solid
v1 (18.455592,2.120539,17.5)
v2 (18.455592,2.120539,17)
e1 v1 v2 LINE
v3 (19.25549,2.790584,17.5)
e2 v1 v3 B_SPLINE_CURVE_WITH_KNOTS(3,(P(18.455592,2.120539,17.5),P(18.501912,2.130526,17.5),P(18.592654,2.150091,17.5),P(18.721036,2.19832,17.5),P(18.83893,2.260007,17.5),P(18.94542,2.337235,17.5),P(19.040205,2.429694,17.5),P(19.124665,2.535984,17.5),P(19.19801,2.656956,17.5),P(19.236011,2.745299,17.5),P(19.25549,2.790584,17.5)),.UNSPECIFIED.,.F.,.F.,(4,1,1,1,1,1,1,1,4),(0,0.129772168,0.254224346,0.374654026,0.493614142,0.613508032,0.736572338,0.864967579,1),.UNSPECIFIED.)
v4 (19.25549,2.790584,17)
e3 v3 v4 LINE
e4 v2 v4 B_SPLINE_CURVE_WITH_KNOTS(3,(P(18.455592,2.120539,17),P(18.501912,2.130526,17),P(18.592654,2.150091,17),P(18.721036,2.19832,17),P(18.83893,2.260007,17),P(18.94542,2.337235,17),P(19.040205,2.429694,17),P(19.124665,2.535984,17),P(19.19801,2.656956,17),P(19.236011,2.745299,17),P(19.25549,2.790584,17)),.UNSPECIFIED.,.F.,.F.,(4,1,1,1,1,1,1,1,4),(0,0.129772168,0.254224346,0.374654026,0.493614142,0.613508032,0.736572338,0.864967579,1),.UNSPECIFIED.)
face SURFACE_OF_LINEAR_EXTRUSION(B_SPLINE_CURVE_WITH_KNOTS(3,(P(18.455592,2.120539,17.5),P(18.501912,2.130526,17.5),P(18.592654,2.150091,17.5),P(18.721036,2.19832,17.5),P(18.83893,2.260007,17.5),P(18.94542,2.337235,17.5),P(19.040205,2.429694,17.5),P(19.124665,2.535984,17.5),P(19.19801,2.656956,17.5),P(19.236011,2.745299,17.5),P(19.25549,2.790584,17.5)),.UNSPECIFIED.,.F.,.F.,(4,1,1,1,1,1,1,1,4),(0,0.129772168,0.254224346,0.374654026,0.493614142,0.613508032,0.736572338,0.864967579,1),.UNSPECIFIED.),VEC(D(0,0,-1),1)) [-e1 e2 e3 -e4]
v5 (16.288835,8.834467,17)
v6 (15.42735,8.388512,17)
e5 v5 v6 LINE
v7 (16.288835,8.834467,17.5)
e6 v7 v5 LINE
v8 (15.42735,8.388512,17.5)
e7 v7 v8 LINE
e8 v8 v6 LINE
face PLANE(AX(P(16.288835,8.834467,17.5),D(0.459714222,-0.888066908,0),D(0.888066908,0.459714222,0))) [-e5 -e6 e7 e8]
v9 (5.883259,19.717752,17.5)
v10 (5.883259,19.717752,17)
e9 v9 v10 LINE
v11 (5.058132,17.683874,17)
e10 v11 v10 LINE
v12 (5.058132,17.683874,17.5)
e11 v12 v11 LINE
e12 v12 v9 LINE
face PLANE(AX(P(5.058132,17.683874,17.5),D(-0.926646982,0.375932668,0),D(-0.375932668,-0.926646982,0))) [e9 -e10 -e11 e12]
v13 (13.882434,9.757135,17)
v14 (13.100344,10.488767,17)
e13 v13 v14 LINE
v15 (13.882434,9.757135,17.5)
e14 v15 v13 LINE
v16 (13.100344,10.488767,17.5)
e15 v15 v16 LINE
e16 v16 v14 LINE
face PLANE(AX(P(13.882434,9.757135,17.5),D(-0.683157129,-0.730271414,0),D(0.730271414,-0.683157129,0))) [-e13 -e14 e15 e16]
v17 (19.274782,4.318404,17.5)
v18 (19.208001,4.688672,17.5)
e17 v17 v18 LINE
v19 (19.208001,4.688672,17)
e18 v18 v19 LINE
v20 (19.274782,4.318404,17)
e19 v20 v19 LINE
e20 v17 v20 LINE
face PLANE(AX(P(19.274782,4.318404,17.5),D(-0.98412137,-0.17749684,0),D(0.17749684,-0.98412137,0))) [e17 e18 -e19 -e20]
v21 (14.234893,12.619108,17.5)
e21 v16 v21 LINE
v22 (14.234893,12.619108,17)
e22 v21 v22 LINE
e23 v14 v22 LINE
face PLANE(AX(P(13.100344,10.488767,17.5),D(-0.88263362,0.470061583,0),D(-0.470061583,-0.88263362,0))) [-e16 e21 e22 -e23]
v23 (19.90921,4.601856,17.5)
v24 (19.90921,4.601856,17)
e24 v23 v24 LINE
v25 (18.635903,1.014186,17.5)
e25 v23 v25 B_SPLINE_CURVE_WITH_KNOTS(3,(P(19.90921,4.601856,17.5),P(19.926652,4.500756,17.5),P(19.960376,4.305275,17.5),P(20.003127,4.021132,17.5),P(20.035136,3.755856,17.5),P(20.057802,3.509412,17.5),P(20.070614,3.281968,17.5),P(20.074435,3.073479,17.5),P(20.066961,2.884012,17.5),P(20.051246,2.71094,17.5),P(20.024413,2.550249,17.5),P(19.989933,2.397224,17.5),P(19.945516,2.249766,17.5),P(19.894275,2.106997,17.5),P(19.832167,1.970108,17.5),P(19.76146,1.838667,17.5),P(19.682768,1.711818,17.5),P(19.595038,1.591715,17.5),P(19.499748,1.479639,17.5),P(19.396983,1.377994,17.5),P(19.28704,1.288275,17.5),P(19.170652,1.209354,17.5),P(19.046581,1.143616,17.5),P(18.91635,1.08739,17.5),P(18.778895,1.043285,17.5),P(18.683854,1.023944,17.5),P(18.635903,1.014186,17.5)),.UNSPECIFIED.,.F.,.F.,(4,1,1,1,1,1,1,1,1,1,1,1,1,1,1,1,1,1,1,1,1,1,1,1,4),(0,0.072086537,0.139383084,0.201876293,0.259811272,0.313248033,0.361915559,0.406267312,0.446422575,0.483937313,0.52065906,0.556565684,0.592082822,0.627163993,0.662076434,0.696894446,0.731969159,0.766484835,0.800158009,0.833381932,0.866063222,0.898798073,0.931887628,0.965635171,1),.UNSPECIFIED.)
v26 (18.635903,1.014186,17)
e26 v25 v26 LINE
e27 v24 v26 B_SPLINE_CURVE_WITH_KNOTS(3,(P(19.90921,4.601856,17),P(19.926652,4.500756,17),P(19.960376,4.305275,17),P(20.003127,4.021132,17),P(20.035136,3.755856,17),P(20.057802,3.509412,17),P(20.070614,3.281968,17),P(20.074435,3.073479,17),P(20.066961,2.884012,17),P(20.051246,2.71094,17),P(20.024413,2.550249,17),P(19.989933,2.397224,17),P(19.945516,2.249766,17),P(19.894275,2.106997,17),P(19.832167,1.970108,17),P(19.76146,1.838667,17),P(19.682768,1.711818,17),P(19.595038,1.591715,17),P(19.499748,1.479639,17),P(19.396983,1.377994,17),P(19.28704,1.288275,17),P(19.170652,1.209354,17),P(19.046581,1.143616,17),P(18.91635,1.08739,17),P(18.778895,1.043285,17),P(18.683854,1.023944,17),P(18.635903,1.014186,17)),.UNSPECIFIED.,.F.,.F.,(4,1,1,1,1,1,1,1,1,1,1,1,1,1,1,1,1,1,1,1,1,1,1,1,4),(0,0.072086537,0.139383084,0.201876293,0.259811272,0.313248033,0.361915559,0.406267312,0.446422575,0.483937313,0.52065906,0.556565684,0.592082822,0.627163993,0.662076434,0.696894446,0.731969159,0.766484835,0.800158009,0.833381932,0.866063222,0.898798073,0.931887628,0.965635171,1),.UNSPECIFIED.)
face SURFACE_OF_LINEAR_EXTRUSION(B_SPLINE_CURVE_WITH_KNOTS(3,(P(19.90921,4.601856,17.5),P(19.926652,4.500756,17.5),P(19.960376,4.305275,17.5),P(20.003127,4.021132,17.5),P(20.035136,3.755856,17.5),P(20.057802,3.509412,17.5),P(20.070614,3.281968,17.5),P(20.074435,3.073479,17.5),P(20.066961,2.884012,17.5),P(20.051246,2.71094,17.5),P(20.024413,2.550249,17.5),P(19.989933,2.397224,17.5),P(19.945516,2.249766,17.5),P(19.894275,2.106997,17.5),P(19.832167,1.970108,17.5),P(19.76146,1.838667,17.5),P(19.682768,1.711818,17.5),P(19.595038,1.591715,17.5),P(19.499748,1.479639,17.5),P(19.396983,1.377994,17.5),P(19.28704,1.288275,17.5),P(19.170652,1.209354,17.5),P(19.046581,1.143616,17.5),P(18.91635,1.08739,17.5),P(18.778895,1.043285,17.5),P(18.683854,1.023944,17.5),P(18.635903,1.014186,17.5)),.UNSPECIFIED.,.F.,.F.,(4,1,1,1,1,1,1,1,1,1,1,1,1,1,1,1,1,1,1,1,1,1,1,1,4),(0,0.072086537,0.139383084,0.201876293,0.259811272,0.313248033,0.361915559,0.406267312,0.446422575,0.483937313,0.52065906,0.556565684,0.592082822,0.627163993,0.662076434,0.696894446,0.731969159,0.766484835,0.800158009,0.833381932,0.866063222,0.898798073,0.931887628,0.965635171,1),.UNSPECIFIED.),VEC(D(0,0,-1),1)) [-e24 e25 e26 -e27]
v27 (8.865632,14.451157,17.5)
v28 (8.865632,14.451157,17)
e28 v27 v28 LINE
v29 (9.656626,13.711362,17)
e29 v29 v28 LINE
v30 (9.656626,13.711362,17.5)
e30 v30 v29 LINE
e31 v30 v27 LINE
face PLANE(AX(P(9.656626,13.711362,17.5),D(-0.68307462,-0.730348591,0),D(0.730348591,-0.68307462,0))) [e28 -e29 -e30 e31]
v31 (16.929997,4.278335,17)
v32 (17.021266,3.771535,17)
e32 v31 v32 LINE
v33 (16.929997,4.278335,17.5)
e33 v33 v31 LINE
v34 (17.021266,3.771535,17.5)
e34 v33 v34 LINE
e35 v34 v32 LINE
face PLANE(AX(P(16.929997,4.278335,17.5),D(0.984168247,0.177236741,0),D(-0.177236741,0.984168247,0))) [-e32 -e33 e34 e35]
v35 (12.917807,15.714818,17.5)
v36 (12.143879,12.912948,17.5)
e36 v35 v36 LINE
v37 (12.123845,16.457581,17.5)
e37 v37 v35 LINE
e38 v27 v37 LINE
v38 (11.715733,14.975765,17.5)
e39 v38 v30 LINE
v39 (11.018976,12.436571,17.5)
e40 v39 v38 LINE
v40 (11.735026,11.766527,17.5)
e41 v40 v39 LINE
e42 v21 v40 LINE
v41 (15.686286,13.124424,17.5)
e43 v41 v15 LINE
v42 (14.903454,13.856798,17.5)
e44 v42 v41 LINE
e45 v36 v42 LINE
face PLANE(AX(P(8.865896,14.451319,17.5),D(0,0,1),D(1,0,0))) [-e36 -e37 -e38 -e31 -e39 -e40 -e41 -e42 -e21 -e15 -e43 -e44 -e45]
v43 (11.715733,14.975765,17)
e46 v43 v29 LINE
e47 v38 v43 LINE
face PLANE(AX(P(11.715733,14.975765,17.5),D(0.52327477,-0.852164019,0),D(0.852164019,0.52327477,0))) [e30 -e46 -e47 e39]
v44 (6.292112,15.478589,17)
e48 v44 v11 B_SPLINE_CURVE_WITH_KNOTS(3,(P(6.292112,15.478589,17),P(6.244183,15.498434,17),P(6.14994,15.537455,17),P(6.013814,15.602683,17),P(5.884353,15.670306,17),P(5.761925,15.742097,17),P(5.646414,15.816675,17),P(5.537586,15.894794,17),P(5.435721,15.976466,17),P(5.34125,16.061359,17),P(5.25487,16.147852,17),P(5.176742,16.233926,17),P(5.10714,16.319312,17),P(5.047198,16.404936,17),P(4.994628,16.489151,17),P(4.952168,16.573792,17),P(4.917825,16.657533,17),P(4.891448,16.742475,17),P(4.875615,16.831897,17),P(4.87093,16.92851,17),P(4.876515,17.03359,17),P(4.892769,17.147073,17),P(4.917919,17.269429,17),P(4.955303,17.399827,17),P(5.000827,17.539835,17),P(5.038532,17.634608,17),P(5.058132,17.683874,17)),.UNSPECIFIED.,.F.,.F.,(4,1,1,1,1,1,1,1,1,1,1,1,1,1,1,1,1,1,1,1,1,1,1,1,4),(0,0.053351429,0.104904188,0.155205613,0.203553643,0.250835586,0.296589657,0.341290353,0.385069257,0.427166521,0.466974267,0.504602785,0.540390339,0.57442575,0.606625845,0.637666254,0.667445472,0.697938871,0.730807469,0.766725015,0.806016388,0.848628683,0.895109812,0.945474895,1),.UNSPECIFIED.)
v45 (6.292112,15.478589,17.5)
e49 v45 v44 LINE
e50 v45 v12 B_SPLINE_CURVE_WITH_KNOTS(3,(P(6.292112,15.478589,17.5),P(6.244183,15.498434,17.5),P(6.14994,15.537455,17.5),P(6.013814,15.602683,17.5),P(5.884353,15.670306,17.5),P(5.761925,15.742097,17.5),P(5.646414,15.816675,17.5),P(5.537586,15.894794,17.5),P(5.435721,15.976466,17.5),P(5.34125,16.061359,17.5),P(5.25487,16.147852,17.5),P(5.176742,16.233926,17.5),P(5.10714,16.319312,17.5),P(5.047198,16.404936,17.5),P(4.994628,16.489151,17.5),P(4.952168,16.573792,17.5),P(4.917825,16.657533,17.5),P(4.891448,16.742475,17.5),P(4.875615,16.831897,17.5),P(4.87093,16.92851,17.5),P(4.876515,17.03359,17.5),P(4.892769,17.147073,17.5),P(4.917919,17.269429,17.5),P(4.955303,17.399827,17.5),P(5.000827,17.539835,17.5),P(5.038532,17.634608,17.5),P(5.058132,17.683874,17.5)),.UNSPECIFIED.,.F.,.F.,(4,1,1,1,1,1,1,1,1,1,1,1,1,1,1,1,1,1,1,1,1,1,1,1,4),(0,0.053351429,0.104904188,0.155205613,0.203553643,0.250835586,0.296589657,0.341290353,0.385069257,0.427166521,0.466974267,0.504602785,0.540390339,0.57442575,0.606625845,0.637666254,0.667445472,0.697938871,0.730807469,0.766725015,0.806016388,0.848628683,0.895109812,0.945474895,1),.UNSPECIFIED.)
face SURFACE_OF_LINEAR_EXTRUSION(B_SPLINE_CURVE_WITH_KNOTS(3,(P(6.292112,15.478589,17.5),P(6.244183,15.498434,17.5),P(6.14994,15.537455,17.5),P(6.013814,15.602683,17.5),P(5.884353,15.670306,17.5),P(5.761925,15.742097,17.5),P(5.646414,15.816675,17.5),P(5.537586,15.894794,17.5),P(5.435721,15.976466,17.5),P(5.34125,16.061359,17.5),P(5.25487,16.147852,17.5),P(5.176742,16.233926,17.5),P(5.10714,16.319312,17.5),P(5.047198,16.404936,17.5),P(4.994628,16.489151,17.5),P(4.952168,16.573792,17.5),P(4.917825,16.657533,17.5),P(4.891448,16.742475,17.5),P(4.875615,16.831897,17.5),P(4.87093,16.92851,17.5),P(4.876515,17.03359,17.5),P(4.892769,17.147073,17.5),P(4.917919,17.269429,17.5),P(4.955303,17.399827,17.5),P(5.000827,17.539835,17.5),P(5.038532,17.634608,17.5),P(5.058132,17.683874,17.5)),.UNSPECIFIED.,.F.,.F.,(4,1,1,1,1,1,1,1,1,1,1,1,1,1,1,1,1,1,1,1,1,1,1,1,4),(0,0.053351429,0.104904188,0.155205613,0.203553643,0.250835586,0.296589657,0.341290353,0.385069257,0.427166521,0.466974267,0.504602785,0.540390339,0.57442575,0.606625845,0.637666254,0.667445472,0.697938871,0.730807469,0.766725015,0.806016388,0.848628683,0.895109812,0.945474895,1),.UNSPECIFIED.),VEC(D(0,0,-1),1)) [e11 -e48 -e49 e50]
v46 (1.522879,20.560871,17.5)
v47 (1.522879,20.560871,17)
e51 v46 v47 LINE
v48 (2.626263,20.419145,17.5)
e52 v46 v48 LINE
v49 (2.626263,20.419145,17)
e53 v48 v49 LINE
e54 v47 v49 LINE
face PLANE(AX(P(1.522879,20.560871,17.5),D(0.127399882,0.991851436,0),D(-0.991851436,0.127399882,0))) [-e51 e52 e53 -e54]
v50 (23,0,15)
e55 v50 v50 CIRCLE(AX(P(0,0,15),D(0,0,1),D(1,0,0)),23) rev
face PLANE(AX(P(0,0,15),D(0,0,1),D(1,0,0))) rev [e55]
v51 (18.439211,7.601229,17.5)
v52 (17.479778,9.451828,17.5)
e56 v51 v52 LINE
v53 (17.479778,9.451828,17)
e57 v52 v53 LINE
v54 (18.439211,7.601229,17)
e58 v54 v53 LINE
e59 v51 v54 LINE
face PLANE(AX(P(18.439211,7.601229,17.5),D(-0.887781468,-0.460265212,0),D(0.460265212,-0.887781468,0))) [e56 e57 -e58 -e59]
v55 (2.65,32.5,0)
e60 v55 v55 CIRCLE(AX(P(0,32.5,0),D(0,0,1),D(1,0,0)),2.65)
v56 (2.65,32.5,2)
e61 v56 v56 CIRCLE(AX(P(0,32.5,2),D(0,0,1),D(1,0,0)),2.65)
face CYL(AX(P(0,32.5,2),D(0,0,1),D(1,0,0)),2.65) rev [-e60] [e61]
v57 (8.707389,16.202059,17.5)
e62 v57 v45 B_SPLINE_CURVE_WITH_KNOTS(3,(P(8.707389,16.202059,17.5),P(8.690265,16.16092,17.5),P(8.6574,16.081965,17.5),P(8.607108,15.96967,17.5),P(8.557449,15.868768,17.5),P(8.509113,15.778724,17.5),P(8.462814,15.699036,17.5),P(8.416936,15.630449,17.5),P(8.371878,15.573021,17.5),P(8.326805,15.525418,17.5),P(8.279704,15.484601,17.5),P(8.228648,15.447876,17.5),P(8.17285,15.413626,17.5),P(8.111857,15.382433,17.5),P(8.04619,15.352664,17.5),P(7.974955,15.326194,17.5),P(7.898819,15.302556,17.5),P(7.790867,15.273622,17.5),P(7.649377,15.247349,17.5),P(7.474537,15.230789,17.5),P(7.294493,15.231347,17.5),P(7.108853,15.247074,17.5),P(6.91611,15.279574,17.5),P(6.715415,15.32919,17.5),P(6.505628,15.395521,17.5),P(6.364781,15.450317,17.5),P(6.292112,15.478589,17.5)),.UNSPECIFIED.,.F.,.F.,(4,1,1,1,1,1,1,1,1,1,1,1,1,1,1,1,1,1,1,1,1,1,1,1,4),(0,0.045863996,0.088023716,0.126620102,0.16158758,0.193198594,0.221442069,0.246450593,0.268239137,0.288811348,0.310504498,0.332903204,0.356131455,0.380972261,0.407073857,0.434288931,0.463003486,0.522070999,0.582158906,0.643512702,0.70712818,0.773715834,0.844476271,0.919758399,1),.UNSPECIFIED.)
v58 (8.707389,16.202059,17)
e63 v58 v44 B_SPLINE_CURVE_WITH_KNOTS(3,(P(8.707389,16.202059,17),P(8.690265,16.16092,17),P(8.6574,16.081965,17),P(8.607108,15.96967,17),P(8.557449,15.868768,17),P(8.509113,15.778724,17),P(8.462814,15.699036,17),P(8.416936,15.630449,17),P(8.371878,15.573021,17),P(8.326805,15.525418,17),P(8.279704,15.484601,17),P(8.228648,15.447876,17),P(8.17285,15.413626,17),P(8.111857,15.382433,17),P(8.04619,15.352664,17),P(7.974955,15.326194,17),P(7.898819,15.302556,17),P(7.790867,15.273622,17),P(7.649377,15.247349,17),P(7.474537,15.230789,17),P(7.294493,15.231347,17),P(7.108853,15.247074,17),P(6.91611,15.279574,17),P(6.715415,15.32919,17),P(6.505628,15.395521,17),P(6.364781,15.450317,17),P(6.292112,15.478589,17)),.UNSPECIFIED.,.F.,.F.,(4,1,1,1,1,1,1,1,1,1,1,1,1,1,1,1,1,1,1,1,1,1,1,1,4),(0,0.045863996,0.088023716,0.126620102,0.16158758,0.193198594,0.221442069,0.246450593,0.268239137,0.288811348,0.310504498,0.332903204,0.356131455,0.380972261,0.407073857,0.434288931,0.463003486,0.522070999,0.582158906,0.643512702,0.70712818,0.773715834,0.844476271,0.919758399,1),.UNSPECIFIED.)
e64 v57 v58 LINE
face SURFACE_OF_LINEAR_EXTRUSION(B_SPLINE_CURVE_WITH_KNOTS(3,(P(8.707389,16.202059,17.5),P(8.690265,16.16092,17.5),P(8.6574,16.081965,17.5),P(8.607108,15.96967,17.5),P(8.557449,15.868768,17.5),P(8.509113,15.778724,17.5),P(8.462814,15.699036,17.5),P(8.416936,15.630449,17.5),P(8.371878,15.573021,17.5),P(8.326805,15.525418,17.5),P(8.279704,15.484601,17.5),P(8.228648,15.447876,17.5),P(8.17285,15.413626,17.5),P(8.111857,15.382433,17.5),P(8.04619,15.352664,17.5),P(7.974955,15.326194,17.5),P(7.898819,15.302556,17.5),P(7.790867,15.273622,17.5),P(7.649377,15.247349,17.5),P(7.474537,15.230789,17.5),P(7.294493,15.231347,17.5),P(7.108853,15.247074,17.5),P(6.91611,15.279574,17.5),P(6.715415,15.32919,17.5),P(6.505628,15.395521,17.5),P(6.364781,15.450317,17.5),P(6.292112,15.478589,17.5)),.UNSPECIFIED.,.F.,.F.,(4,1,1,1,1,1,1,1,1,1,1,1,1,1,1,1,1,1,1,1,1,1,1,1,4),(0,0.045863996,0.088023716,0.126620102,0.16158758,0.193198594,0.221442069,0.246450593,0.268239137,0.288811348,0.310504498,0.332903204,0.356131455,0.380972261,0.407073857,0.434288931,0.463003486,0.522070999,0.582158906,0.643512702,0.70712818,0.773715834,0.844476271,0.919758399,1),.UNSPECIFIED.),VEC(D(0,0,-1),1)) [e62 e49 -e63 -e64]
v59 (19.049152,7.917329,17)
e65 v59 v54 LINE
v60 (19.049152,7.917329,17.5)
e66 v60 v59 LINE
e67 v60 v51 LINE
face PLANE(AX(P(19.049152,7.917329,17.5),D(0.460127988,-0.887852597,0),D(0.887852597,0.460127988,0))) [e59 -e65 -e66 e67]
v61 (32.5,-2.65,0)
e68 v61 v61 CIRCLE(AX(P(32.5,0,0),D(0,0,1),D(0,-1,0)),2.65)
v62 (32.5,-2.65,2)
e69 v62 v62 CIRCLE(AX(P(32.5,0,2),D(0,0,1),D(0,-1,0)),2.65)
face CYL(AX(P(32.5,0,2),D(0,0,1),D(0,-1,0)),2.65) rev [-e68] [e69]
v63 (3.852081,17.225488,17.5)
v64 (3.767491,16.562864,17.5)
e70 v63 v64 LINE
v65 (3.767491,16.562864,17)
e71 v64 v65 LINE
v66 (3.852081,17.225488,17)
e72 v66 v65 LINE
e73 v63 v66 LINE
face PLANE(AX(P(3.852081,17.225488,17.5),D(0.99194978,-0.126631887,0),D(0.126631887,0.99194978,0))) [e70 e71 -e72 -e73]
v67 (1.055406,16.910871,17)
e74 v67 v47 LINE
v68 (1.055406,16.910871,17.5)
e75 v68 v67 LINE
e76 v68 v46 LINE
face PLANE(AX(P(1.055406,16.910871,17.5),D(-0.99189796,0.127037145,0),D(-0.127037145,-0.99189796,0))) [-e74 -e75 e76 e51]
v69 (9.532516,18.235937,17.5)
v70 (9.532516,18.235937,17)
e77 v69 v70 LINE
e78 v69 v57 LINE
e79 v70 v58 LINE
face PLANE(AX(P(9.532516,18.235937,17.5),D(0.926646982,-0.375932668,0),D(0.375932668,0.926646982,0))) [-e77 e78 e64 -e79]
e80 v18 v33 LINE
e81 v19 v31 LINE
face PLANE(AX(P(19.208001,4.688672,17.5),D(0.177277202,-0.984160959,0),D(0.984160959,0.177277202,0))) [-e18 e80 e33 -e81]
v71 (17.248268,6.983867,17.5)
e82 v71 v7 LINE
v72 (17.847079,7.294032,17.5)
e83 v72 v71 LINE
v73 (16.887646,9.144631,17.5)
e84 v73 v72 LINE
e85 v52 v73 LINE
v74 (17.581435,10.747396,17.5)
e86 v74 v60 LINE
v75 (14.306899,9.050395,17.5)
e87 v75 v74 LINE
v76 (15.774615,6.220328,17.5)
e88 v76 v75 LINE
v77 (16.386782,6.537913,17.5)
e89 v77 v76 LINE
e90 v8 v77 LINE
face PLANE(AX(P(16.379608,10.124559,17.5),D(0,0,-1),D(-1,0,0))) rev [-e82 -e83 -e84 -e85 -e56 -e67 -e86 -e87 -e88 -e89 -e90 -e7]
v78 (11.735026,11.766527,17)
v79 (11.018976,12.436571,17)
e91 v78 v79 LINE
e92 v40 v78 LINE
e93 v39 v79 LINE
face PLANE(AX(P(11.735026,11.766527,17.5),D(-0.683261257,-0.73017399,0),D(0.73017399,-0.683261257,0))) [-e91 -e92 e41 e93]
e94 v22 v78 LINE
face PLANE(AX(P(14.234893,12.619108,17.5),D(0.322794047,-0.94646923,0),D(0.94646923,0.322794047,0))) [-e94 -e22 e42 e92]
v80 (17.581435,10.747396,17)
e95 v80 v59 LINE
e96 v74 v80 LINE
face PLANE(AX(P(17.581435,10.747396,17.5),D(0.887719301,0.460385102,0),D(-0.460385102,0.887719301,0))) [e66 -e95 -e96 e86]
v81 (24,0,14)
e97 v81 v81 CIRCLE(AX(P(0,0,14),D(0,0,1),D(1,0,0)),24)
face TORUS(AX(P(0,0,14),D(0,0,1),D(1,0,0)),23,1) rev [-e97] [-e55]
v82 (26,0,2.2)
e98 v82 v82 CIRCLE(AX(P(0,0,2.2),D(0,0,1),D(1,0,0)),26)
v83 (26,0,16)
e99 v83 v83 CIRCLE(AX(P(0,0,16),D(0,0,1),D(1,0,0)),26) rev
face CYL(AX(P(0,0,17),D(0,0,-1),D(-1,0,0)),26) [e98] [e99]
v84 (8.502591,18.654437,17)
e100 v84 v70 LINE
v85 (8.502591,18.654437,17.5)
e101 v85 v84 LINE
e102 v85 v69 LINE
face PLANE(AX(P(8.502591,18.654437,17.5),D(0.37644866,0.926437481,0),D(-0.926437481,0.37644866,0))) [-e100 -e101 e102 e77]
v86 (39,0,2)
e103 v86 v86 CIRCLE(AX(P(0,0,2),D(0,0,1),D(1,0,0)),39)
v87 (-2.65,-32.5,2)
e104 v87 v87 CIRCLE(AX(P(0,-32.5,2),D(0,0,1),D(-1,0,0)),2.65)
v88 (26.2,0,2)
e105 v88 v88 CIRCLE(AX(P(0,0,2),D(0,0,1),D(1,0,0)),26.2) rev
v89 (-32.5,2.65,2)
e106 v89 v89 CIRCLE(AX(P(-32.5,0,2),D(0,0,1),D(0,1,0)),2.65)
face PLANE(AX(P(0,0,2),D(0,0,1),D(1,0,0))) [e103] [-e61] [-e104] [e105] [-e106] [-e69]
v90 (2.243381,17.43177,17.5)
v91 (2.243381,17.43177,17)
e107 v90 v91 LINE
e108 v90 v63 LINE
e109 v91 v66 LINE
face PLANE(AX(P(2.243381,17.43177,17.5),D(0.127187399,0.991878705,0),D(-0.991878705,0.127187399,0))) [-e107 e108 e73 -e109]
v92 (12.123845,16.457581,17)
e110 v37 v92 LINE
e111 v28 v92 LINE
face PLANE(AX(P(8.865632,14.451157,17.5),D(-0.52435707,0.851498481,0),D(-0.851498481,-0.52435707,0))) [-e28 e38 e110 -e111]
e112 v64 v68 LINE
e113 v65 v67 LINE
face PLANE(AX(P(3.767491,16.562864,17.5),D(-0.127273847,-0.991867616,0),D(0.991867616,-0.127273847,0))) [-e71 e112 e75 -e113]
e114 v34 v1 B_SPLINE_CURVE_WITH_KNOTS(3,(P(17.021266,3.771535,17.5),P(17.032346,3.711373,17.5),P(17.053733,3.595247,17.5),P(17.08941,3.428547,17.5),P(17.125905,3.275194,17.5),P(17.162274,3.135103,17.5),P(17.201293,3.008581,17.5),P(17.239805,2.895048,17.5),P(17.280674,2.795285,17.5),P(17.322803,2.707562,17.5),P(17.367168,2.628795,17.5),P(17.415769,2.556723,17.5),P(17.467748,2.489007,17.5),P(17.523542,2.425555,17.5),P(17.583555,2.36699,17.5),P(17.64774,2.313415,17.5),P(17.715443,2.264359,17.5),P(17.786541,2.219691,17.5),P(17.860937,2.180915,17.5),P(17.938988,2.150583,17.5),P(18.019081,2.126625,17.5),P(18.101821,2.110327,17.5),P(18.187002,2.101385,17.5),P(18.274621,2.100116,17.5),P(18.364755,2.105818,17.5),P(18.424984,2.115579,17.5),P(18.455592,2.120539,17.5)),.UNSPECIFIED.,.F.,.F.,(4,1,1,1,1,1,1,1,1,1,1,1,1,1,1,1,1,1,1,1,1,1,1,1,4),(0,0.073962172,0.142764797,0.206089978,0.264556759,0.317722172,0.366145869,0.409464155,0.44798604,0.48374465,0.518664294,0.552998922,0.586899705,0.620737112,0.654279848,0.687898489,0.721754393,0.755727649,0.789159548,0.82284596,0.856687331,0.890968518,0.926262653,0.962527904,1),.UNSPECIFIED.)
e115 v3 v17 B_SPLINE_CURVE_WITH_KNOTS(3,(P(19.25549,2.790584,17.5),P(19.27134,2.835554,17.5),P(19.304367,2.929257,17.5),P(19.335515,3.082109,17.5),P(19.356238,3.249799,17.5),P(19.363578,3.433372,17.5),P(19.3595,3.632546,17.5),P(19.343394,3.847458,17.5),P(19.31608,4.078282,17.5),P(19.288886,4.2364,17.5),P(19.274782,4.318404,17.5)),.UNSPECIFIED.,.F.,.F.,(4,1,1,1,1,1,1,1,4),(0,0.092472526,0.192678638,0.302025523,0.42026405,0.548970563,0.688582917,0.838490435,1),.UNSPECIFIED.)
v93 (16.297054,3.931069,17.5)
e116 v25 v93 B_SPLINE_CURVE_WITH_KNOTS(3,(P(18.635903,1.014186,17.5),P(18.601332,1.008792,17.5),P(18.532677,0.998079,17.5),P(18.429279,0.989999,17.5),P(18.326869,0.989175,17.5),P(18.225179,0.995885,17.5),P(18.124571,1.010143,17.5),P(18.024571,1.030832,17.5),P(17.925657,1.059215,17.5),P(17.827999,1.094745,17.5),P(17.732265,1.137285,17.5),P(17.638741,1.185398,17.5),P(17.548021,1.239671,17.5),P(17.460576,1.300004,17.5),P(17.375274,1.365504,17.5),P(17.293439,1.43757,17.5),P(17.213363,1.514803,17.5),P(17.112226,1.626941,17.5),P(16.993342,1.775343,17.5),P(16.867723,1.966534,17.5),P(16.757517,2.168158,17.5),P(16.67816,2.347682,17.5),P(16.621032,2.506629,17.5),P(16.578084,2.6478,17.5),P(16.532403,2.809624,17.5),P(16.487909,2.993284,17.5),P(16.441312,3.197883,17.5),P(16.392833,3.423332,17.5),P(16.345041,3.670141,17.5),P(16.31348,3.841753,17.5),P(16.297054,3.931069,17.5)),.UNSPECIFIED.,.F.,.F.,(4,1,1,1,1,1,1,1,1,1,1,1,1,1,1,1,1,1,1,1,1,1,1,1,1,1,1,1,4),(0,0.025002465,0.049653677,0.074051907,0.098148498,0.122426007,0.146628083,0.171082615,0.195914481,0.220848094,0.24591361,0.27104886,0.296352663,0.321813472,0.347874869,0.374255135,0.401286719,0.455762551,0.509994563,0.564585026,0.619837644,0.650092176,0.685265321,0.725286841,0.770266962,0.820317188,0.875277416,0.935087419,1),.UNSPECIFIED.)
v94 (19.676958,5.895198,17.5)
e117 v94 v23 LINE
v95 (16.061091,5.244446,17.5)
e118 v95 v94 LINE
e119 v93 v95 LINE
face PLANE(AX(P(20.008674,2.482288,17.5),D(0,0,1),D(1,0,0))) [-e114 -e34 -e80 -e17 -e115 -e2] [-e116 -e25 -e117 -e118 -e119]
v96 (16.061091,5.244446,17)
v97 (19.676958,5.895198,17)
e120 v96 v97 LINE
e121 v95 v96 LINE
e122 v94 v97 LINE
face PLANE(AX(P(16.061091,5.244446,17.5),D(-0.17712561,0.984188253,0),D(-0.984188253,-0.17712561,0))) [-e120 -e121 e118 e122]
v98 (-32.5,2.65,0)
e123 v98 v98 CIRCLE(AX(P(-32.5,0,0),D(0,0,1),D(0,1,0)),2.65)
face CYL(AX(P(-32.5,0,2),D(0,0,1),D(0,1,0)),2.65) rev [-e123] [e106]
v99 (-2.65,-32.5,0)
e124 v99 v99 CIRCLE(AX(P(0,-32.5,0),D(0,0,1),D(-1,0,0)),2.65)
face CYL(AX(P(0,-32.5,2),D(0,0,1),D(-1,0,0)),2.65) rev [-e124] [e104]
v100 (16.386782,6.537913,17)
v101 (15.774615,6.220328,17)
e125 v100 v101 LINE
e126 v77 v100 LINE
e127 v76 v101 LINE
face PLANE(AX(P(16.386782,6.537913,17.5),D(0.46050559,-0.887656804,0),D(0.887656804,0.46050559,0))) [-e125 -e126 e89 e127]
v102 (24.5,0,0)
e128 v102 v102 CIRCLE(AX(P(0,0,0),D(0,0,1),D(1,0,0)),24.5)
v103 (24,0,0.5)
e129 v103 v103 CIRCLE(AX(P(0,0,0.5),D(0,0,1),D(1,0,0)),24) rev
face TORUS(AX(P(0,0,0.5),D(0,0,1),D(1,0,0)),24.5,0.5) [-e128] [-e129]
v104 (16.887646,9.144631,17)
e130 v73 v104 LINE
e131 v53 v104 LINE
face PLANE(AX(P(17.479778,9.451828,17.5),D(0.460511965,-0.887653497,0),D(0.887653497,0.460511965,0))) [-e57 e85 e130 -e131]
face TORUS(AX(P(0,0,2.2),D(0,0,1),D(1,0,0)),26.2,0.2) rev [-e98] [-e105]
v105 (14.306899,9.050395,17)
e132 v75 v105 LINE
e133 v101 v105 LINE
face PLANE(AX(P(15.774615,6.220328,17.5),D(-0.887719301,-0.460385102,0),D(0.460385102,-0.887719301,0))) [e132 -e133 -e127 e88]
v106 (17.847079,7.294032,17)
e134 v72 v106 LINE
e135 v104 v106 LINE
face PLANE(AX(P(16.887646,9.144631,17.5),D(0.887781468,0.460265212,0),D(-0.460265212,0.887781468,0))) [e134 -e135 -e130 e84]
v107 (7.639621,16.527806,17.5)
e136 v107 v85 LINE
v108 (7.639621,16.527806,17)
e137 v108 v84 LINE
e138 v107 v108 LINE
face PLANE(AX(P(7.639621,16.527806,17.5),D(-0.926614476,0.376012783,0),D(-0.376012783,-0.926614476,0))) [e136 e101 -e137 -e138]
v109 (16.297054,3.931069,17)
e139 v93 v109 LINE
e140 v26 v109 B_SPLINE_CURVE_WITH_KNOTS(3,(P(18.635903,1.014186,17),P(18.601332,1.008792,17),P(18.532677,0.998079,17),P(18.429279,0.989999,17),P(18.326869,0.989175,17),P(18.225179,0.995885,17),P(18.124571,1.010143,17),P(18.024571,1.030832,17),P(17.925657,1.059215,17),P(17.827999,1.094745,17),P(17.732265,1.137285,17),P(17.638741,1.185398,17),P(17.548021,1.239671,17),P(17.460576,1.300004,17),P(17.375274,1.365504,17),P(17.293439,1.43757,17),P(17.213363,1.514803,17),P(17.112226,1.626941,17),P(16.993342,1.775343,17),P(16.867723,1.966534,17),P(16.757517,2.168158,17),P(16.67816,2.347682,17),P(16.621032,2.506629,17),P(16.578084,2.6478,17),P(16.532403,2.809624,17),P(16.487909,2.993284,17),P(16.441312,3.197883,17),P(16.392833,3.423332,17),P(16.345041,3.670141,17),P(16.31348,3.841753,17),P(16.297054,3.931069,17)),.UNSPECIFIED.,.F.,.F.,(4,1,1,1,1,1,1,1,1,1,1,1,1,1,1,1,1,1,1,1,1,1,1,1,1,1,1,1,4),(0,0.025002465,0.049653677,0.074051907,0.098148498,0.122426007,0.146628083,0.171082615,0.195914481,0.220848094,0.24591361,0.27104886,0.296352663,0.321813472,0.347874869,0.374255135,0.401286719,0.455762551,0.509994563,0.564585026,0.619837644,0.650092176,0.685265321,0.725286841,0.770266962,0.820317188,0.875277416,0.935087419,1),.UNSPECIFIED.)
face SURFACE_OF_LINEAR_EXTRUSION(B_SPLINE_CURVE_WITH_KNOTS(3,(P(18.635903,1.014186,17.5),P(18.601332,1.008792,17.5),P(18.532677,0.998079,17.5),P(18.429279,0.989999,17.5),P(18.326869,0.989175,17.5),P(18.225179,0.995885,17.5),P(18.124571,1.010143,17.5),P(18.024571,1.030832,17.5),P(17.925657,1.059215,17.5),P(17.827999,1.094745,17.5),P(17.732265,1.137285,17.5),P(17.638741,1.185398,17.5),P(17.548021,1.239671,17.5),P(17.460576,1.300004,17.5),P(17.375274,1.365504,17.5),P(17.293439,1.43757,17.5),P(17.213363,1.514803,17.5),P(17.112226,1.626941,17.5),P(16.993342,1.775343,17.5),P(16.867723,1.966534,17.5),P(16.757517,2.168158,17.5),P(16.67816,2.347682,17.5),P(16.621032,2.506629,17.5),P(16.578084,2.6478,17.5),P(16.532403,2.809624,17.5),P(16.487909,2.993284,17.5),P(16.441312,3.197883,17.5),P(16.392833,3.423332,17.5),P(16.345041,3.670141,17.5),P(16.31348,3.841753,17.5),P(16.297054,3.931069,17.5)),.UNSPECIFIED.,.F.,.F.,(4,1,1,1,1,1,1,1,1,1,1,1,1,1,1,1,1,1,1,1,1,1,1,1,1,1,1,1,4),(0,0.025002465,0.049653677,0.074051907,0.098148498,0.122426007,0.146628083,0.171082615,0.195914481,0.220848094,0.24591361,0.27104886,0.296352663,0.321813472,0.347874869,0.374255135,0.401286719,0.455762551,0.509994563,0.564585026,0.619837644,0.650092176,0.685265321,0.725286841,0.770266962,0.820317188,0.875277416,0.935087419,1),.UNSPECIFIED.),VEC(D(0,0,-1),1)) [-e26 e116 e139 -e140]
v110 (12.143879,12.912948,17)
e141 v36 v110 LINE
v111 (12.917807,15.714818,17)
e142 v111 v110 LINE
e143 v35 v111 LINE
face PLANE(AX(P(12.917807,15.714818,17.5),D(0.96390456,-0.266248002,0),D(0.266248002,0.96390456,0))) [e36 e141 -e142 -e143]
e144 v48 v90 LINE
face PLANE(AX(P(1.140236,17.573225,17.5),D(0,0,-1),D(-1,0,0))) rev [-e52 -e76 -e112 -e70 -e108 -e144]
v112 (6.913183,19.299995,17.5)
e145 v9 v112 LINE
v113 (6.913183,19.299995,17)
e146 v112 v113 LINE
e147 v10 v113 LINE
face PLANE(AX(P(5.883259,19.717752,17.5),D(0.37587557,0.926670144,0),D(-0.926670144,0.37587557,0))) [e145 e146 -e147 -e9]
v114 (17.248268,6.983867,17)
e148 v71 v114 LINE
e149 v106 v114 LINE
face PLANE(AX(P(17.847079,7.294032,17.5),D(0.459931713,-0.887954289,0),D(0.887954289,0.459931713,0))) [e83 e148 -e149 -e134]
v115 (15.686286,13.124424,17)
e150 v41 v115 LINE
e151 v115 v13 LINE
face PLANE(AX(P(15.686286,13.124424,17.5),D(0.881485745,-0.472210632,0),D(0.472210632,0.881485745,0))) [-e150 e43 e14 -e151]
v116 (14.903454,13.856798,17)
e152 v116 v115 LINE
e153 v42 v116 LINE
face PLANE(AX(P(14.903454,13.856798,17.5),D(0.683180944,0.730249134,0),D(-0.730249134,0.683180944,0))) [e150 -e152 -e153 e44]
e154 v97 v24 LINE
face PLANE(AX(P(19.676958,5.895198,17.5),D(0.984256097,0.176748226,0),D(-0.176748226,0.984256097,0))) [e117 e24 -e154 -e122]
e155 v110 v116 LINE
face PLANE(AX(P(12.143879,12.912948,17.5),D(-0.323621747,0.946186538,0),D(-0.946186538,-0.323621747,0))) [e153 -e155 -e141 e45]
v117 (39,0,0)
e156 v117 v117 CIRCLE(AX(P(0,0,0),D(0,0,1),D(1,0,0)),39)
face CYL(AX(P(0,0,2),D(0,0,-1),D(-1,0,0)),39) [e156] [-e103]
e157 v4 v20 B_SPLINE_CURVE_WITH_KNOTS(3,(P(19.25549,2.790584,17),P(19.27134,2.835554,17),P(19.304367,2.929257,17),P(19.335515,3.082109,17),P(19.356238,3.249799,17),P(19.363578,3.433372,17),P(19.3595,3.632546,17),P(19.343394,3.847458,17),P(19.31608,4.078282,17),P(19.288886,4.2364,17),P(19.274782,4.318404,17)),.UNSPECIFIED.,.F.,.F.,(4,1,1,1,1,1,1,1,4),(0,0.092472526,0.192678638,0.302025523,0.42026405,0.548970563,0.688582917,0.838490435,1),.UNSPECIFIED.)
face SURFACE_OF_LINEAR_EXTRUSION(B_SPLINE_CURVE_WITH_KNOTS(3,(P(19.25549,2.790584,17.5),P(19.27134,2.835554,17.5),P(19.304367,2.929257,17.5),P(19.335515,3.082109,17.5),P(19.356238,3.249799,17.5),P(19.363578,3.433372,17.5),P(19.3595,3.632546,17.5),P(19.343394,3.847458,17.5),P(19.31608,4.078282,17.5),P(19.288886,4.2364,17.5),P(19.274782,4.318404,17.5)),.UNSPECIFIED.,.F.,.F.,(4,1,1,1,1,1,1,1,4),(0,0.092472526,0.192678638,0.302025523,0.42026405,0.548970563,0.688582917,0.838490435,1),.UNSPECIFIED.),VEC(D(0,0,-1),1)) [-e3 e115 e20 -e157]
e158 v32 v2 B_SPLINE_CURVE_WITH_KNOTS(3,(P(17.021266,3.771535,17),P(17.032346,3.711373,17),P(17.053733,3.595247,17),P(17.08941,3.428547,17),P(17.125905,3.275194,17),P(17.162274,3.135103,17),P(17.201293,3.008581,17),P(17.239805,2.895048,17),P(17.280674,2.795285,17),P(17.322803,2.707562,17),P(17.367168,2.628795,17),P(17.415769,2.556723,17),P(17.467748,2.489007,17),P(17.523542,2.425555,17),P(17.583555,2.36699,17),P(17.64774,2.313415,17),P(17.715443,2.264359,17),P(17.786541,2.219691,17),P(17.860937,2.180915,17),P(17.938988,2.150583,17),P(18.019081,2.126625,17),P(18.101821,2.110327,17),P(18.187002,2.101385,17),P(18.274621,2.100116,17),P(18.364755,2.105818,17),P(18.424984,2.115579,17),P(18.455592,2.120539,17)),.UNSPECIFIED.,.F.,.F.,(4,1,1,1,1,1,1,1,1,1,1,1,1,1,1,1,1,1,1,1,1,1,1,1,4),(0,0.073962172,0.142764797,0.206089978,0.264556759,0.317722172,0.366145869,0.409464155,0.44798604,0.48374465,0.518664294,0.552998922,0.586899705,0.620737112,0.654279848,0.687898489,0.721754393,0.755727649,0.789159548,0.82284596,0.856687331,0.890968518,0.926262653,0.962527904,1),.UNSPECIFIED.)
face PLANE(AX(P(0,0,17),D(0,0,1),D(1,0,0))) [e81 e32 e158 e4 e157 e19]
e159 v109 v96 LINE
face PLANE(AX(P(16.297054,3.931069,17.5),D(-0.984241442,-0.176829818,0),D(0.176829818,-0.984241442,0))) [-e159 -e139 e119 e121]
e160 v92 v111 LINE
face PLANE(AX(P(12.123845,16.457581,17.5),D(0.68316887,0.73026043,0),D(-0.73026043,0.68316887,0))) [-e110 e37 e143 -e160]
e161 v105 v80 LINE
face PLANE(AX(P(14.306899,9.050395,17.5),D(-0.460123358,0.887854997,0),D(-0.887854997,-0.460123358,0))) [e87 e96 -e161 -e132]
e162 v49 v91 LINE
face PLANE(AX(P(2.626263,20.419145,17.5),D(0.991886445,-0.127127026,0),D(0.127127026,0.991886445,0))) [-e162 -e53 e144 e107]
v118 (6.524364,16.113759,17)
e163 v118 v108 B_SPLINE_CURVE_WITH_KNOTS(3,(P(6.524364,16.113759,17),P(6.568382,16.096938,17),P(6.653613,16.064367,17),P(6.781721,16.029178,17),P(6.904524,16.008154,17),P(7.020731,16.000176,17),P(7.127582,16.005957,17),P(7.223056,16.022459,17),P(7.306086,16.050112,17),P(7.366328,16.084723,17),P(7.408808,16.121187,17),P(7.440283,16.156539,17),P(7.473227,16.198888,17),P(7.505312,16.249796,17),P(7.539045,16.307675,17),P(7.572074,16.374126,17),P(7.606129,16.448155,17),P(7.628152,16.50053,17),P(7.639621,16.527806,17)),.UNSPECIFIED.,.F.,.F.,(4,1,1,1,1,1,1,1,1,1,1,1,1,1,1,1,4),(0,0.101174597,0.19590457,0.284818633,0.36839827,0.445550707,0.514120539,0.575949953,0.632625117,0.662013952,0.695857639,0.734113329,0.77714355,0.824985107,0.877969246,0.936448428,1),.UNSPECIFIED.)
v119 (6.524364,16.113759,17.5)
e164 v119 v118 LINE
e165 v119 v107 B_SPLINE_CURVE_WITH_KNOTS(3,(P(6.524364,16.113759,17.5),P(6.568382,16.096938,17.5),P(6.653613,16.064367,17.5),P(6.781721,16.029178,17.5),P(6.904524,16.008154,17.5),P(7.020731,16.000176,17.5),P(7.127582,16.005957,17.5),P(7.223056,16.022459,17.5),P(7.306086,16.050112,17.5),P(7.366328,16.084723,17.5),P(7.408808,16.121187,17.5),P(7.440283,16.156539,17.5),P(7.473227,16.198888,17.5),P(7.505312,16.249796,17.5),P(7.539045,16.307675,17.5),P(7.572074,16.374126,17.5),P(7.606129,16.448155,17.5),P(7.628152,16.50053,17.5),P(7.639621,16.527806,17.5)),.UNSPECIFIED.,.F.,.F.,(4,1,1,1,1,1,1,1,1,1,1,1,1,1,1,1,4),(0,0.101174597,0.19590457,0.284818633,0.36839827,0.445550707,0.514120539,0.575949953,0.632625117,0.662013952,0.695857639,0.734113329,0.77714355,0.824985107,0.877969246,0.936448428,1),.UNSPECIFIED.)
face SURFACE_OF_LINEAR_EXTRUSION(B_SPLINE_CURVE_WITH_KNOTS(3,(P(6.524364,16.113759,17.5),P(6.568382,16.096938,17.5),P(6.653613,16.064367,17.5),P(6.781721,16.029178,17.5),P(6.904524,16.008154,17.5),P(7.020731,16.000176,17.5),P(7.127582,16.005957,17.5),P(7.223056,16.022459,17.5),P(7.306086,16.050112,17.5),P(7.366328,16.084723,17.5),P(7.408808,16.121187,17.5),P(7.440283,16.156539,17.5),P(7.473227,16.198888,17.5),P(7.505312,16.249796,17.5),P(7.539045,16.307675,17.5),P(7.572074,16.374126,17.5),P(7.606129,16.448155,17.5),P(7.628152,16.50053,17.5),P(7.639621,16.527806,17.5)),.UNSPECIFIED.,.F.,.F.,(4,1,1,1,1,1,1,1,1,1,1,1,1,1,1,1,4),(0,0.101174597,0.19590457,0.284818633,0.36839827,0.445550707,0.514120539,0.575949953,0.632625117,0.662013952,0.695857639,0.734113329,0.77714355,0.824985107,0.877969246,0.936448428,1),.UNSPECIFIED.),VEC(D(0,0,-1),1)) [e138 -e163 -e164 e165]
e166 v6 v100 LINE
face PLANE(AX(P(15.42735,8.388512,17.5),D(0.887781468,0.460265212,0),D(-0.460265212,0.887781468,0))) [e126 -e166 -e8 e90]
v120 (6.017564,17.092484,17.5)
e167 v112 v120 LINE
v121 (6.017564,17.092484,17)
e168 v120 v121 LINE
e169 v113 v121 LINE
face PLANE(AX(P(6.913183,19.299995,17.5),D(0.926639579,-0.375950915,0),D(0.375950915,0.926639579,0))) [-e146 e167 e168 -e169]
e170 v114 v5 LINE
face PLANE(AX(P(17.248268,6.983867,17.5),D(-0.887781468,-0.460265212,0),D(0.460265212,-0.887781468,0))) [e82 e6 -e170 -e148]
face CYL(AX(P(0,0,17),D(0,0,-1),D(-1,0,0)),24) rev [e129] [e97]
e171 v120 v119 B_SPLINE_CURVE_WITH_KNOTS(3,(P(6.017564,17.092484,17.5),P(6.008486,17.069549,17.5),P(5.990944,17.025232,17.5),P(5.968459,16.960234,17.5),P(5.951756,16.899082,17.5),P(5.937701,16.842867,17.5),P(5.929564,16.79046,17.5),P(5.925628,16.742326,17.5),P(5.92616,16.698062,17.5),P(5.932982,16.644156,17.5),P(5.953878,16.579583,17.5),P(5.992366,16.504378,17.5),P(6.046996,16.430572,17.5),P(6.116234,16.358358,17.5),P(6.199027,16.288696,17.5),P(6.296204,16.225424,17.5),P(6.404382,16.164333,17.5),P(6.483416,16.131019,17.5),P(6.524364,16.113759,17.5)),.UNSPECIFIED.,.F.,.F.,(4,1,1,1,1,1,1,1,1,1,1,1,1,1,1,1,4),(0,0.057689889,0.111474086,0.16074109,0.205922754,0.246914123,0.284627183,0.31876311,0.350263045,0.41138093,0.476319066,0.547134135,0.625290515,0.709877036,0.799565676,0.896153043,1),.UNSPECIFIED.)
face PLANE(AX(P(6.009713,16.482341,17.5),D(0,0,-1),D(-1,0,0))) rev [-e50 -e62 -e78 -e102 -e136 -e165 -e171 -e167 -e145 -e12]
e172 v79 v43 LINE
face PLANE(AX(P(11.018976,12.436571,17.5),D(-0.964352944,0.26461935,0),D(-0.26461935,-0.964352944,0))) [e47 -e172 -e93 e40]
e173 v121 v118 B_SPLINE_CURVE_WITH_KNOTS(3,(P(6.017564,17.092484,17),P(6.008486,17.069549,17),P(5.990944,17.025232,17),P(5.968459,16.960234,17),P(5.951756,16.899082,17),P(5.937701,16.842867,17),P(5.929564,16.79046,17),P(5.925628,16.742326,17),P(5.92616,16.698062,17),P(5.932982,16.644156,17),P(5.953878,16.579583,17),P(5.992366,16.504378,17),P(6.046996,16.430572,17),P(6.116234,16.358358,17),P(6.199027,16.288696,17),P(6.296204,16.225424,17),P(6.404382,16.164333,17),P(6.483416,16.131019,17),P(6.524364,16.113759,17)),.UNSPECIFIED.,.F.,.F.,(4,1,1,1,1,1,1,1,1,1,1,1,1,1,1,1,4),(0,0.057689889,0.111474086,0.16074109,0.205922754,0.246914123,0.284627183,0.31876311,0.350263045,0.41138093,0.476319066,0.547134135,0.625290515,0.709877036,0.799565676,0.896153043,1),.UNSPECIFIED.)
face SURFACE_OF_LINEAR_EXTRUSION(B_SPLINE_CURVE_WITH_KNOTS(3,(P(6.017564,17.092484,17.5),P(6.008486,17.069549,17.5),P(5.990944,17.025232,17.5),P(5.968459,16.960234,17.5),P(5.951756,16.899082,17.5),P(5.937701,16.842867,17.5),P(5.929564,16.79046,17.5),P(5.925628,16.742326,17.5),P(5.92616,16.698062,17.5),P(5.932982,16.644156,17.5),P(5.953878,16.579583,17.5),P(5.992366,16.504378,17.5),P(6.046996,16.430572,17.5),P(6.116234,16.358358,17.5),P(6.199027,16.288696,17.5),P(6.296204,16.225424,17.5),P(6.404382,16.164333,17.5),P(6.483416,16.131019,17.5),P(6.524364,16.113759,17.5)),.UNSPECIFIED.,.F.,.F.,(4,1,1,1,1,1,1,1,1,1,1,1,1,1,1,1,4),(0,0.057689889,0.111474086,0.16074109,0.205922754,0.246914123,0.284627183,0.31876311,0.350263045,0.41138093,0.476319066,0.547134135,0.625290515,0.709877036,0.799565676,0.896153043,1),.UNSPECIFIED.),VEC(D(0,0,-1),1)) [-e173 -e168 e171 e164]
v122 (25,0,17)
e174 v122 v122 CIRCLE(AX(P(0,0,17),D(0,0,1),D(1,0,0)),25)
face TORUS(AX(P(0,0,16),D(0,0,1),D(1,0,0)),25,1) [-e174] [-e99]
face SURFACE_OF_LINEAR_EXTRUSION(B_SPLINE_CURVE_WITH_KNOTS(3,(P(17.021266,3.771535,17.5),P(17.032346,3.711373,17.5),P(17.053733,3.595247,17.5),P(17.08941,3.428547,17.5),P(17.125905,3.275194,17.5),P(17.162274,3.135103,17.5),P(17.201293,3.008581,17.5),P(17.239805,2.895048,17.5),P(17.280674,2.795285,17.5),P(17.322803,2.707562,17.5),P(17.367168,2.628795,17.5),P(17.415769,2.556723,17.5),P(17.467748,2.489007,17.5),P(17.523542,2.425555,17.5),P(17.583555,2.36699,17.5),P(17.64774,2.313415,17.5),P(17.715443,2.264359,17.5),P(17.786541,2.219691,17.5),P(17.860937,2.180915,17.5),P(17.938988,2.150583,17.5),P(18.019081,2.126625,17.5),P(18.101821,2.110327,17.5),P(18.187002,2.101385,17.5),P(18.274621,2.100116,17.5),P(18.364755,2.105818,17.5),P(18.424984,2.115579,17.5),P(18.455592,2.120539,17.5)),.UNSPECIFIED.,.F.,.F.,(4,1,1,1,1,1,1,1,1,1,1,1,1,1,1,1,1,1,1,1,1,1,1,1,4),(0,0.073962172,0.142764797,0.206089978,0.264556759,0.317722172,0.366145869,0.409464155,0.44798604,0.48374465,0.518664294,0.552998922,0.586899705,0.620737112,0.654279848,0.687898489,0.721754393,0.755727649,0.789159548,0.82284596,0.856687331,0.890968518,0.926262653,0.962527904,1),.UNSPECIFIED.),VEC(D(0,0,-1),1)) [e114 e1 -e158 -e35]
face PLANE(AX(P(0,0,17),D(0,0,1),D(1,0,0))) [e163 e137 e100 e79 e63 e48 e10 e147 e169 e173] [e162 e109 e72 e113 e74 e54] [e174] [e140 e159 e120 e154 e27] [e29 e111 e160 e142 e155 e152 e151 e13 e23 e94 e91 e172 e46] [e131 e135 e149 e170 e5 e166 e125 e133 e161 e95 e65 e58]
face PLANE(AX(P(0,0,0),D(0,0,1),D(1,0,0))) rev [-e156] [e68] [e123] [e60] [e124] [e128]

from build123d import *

# Parameters (mm, degrees)
SKETCH1_R            = 39
EXTRUDE1_DEPTH       = 2
SKETCH2_R            = 26
EXTRUDE3_DEPTH       = 15
FILLET1_R            = 1
SHELL1_OUTLINE_R     = 24
SHELL1_DEPTH         = 15
FILLET3_R            = 0.2
FILLET4_R            = 0.5
FILLET5_R            = 1
M5_CLEARANCE_HOLE2_D = 5.3
CIRPATTERN2_COUNT    = 4
EXTRUDE4_DEPTH       = 0.5


# Read off the part's stored shape, not the designer's step: Shell1
with BuildPart() as part:
    # Sketch1 → Extrude1 (new body)
    with BuildSketch(Plane.XY):
        Circle(SKETCH1_R)
    extrude(amount=EXTRUDE1_DEPTH)

    # Sketch2 → Extrude3 (add)
    with BuildSketch(Plane.XY.offset(2)):
        Circle(SKETCH2_R)
    extrude(amount=EXTRUDE3_DEPTH)

    # Fillet1
    fillet1_edges = [part.edges().sort_by_distance(p)[0] for p in [
        (-26, 0, 17),
    ]]
    fillet(fillet1_edges, radius=FILLET1_R)

    # Shell1 outline → Shell1 (cut)
    with BuildSketch(Plane.XY):
        Circle(SHELL1_OUTLINE_R)
    extrude(amount=SHELL1_DEPTH, mode=Mode.SUBTRACT)

    # Fillet3
    fillet3_edges = [part.edges().sort_by_distance(p)[0] for p in [
        (-26, 0, 2),
    ]]
    fillet(fillet3_edges, radius=FILLET3_R)

    # Fillet4
    fillet4_edges = [part.edges().sort_by_distance(p)[0] for p in [
        (-24, 0, 0),
    ]]
    fillet(fillet4_edges, radius=FILLET4_R)

    # Fillet5
    fillet5_edges = [part.edges().sort_by_distance(p)[0] for p in [
        (-24, 0, 15),
    ]]
    fillet(fillet5_edges, radius=FILLET5_R)

    # M5 Clearance Hole2 (through all)
    with Locations(Plane.XY.offset(2)):
        with Locations((0, 32.5)):
            m5_clearance_hole2 = Hole(M5_CLEARANCE_HOLE2_D / 2)

    # CirPattern2: M5 Clearance Hole2 ×4 about axis
    cirpattern2_axis = Axis((0, 0, 0), (0, 0, 1))
    for i in range(1, CIRPATTERN2_COUNT):
        add(m5_clearance_hole2.rotate(cirpattern2_axis, i * 360 / CIRPATTERN2_COUNT), mode=Mode.SUBTRACT)

    # Sketch7 → Extrude4 (add)
    # profile 1 of 5: a face of its own
    with BuildSketch(Plane.XY.offset(17)):
        with BuildLine():
            Line((19.676957621, 5.895197773), (19.909210058, 4.601855926))
            add(Edge.make_bspline(
                [(19.909210058, 4.601855926), (19.926651632, 4.500756414), (19.960375824, 4.305275227), (20.003127109, 4.021131614), (20.035136253, 3.755856277), (20.057801947, 3.50941192), (20.070613778, 3.281967505), (20.074435398, 3.073479481), (20.066961458, 2.884011603), (20.051245996, 2.710939809), (20.024412986, 2.550248712), (19.989932757, 2.397223976), (19.945515818, 2.249766305), (19.894274619, 2.106997056), (19.832166687, 1.970108117), (19.761460303, 1.838667258), (19.682767862, 1.711818388), (19.595037947, 1.5917147), (19.499748057, 1.479638905), (19.396983344, 1.377993746), (19.28704005, 1.288275306), (19.170652181, 1.209353696), (19.046580749, 1.143616013), (18.91635037, 1.087389919), (18.77889519, 1.043285188), (18.68385402, 1.023944482), (18.635902767, 1.014186489)],
                knots=[0, 0, 0, 0, 1.730076892, 3.345194012, 4.845031028, 6.235470528, 7.517952796, 8.685973408, 9.750415481, 10.714141801, 11.614495518, 12.495817449, 13.357576408, 14.209987726, 15.051935834, 15.889834422, 16.725466702, 17.567259816, 18.395636046, 19.203792226, 20.001166367, 20.785517328, 21.571153748, 22.36530307, 23.175244092, 24, 24, 24, 24], degree=3))
            add(Edge.make_bspline(
                [(18.635902767, 1.014186489), (18.601332211, 1.008792177), (18.532676771, 0.998079338), (18.429279177, 0.989999215), (18.326869474, 0.989175032), (18.22517881, 0.995885426), (18.124571089, 1.010143405), (18.024571455, 1.030831771), (17.925656818, 1.059215457), (17.827998765, 1.094745096), (17.732265048, 1.137285173), (17.638741204, 1.185398285), (17.548021241, 1.239670585), (17.460576449, 1.300003798), (17.375273895, 1.365504104), (17.293439096, 1.437570028), (17.213363047, 1.514802593), (17.112225961, 1.626941287), (16.993341681, 1.77534263), (16.86772283, 1.966533878), (16.757516889, 2.168158053), (16.678159583, 2.347681675), (16.62103193, 2.506628847), (16.578084306, 2.647799896), (16.532403009, 2.80962355), (16.487908625, 2.993283627), (16.441312375, 3.197882505), (16.392833179, 3.423332012), (16.345041361, 3.670140713), (16.313480153, 3.841752829), (16.297053942, 3.931069335)],
                knots=[0, 0, 0, 0, 0.700069007, 1.390302967, 2.07345339, 2.748157948, 3.427928198, 4.105586319, 4.790313218, 5.485605459, 6.183746622, 6.885581077, 7.589368078, 8.297874576, 9.010777227, 9.740496332, 10.479143782, 11.236028141, 12.761351436, 14.279847751, 15.808380735, 17.355454046, 18.202580936, 19.187428998, 20.308031537, 21.567474943, 22.968881258, 24.507767656, 26.182447736, 28, 28, 28, 28], degree=3))
            Line((16.297053942, 3.931069335), (16.061091402, 5.244445737))
            Line((16.061091402, 5.244445737), (19.676957621, 5.895197773))
        make_face()
        with BuildLine():
            Line((19.208000623, 4.688672333), (16.929997485, 4.27833496))
            Line((16.929997485, 4.27833496), (17.021266015, 3.771534913))
            add(Edge.make_bspline(
                [(17.021266015, 3.771534913), (17.032345987, 3.711373225), (17.053733, 3.595246685), (17.089409635, 3.428546915), (17.125904798, 3.275194319), (17.162274443, 3.135102557), (17.201293405, 3.00858141), (17.239805196, 2.895047806), (17.280674034, 2.795284581), (17.322803022, 2.707562492), (17.367167925, 2.628795417), (17.415768928, 2.556722787), (17.467747655, 2.489006687), (17.5235422, 2.425554712), (17.583554861, 2.366990452), (17.647740166, 2.313415224), (17.715443468, 2.264358919), (17.78654117, 2.219690581), (17.86093744, 2.180915018), (17.938988478, 2.150582726), (18.019080747, 2.126625083), (18.101820962, 2.110326722), (18.187002339, 2.10138524), (18.27462071, 2.100115904), (18.364754991, 2.105817523), (18.424984256, 2.11557869), (18.455591769, 2.120539153)],
                knots=[0, 0, 0, 0, 1.775092123, 3.426355128, 4.946159467, 6.349362224, 7.625332135, 8.787500866, 9.827139712, 10.751664961, 11.609871591, 12.447943051, 13.271974121, 14.085592912, 14.897690682, 15.702716349, 16.509563741, 17.322105437, 18.137463576, 18.939829159, 19.748303036, 20.560495954, 21.383244435, 22.230303678, 23.100669685, 24, 24, 24, 24], degree=3))
            add(Edge.make_bspline(
                [(18.455591769, 2.120539153), (18.501912095, 2.1305263), (18.592653852, 2.150091173), (18.721035792, 2.198320249), (18.838930231, 2.260006867), (18.945420071, 2.337235377), (19.040204715, 2.429694213), (19.124665474, 2.535983583), (19.198010124, 2.656956303), (19.236010853, 2.745299303), (19.255489939, 2.790583724)],
                knots=[0, 0, 0, 0, 1.038177342, 2.033794765, 2.997232208, 3.948913134, 4.908064258, 5.892578705, 6.919740629, 8, 8, 8, 8], degree=3))
            add(Edge.make_bspline(
                [(19.255489939, 2.790583724), (19.271340372, 2.835554425), (19.304366828, 2.929256779), (19.335515387, 3.082108884), (19.356237644, 3.249799018), (19.363578257, 3.433371754), (19.359499759, 3.632545511), (19.343394445, 3.847458387), (19.316080336, 4.078281915), (19.288886141, 4.236399757), (19.274782474, 4.31840407)],
                knots=[0, 0, 0, 0, 0.739780208, 1.541429103, 2.416204183, 3.362112403, 4.391764505, 5.508663336, 6.707923483, 8, 8, 8, 8], degree=3))
            Line((19.274782474, 4.31840407), (19.208000623, 4.688672333))
        make_face(mode=Mode.SUBTRACT)
    # profile 2 of 5: a face of its own
    with BuildSketch(Plane.XY.offset(17)):
        Polygon((17.581435301, 10.747395777), (19.049151981, 7.917329337), (18.439211075, 7.601228576), (17.479778483, 9.451827868), (16.887646071, 9.144631354), (17.847078663, 7.294032062), (17.248268066, 6.983867465), (16.288835474, 8.834466757), (15.427349597, 8.388512397), (16.386782189, 6.537913105), (15.774615222, 6.220328302), (14.306898542, 9.050394742), align=None)
    # profile 3 of 5: a face of its own
    with BuildSketch(Plane.XY.offset(17)):
        Polygon((12.123844788, 16.457580555), (12.917806794, 15.714817969), (12.143879344, 12.912948311), (14.90345383, 13.856798471), (15.686285527, 13.124424172), (13.88243353, 9.757134842), (13.100343854, 10.488767121), (14.234893299, 12.619108166), (11.735026012, 11.766526536), (11.018976165, 12.436571107), (11.715733477, 14.975765485), (9.656626406, 13.71136244), (8.865632482, 14.451156944), align=None)
    # profile 4 of 5: a face of its own
    with BuildSketch(Plane.XY.offset(17)):
        with BuildLine():
            Line((5.883258698, 19.717752428), (6.913183244, 19.299994849))
            Line((6.913183244, 19.299994849), (6.01756442, 17.092483664))
            add(Edge.make_bspline(
                [(6.01756442, 17.092483664), (6.008486233, 17.069548786), (5.990944466, 17.025231756), (5.968459411, 16.960233961), (5.951756013, 16.899082481), (5.937700658, 16.842866609), (5.929563581, 16.790459558), (5.925628424, 16.742326117), (5.926160317, 16.698062126), (5.932981546, 16.644156349), (5.953878485, 16.579582514), (5.992366342, 16.504378403), (6.046995799, 16.430571608), (6.116233762, 16.35835831), (6.199026795, 16.288695912), (6.296204469, 16.225423966), (6.404381617, 16.164332538), (6.483415994, 16.131018738), (6.524364467, 16.113758537)],
                knots=[0, 0, 0, 0, 0.923038225, 1.783585378, 2.571857434, 3.294764068, 3.950625969, 4.554034933, 5.100209756, 5.604208717, 6.582094882, 7.621105052, 8.754146159, 10.004648243, 11.358032571, 12.793050822, 14.338448695, 16, 16, 16, 16], degree=3))
            add(Edge.make_bspline(
                [(6.524364467, 16.113758537), (6.568381949, 16.096937583), (6.653613085, 16.064367136), (6.781720621, 16.029178008), (6.904523521, 16.008154167), (7.020730873, 16.000176227), (7.127582444, 16.005957413), (7.223056232, 16.022459059), (7.306086108, 16.050112017), (7.366327548, 16.0847227), (7.408808112, 16.121187462), (7.440283212, 16.156538569), (7.473227208, 16.198887508), (7.50531201, 16.249796421), (7.539045, 16.307675031), (7.572073799, 16.374126456), (7.606128878, 16.448155364), (7.628152069, 16.500530119), (7.639621378, 16.527806013)],
                knots=[0, 0, 0, 0, 1.618793555, 3.134473113, 4.557098125, 5.894372325, 7.128811318, 8.225928628, 9.215199246, 10.122001872, 10.59222323, 11.133722231, 11.745813266, 12.4342968, 13.199761712, 14.047507939, 14.983174849, 16, 16, 16, 16], degree=3))
            Line((7.639621378, 16.527806013), (8.502591297, 18.654436956))
            Line((8.502591297, 18.654436956), (9.532515842, 18.235937357))
            Line((9.532515842, 18.235937357), (8.707388973, 16.202058985))
            add(Edge.make_bspline(
                [(8.707388973, 16.202058985), (8.690264857, 16.160919945), (8.657399682, 16.081964525), (8.607108499, 15.969669644), (8.55744861, 15.868768385), (8.509112965, 15.77872354), (8.462814268, 15.699035754), (8.416936123, 15.630448533), (8.37187755, 15.573021449), (8.326805301, 15.525418292), (8.279703663, 15.484600977), (8.228647973, 15.447875675), (8.172850214, 15.413626493), (8.111856943, 15.382432709), (8.046190439, 15.352664304), (7.974955261, 15.326194129), (7.898819327, 15.302555845), (7.790866987, 15.273622216), (7.649377033, 15.247349008), (7.474537056, 15.230788837), (7.294493017, 15.231346738), (7.108853114, 15.247073838), (6.916109728, 15.279574202), (6.715415009, 15.329190125), (6.505627921, 15.395521078), (6.364781141, 15.450317186), (6.29211203, 15.478588933)],
                knots=[0, 0, 0, 0, 1.100735908, 2.112569176, 3.038882457, 3.878101929, 4.636766245, 5.314609658, 5.914814222, 6.437739277, 6.931472359, 7.452107952, 7.989676895, 8.547154927, 9.143334263, 9.769772578, 10.422934341, 11.112083662, 12.529703976, 13.971813743, 15.444304845, 16.971076327, 18.569180017, 20.267430496, 22.074201565, 24, 24, 24, 24], degree=3))
            add(Edge.make_bspline(
                [(6.29211203, 15.478588933), (6.244182676, 15.498433981), (6.149939842, 15.53745503), (6.013814463, 15.602683122), (5.88435309, 15.670306438), (5.761925489, 15.742097212), (5.646414389, 15.816675017), (5.537586093, 15.894793889), (5.435720867, 15.976466149), (5.341250196, 16.061358864), (5.25487038, 16.147851514), (5.176741706, 16.233925948), (5.107139964, 16.319311849), (5.047198038, 16.404936156), (4.994627838, 16.489150823), (4.952167889, 16.573792183), (4.917824859, 16.65753338), (4.891447957, 16.742475337), (4.875614972, 16.831896812), (4.870930006, 16.928509796), (4.876515247, 17.033590153), (4.892769381, 17.147072804), (4.917918785, 17.269428531), (4.955303193, 17.399827213), (5.000827179, 17.539834697), (5.038531814, 17.63460801), (5.058131828, 17.683874055)],
                knots=[0, 0, 0, 0, 1.280434306, 2.517700506, 3.724934716, 4.885287436, 6.020054073, 7.118151758, 8.190968479, 9.241662168, 10.251996506, 11.207382413, 12.110466848, 12.96936814, 13.786218001, 14.559020287, 15.303990097, 16.01869134, 16.7505329, 17.539379253, 18.401400366, 19.344393315, 20.3670884, 21.482635478, 22.691397491, 24, 24, 24, 24], degree=3))
            Line((5.058131828, 17.683874055), (5.883258698, 19.717752428))
        make_face()
    # profile 5 of 5: a face of its own
    with BuildSketch(Plane.XY.offset(17)):
        Polygon((1.522878641, 20.560870651), (2.626263223, 20.419144723), (2.243380611, 17.431769924), (3.852081199, 17.225488206), (3.767490854, 16.56286384), (1.055405684, 16.910871486), align=None)
    extrude(amount=EXTRUDE4_DEPTH)


solid = part.part
